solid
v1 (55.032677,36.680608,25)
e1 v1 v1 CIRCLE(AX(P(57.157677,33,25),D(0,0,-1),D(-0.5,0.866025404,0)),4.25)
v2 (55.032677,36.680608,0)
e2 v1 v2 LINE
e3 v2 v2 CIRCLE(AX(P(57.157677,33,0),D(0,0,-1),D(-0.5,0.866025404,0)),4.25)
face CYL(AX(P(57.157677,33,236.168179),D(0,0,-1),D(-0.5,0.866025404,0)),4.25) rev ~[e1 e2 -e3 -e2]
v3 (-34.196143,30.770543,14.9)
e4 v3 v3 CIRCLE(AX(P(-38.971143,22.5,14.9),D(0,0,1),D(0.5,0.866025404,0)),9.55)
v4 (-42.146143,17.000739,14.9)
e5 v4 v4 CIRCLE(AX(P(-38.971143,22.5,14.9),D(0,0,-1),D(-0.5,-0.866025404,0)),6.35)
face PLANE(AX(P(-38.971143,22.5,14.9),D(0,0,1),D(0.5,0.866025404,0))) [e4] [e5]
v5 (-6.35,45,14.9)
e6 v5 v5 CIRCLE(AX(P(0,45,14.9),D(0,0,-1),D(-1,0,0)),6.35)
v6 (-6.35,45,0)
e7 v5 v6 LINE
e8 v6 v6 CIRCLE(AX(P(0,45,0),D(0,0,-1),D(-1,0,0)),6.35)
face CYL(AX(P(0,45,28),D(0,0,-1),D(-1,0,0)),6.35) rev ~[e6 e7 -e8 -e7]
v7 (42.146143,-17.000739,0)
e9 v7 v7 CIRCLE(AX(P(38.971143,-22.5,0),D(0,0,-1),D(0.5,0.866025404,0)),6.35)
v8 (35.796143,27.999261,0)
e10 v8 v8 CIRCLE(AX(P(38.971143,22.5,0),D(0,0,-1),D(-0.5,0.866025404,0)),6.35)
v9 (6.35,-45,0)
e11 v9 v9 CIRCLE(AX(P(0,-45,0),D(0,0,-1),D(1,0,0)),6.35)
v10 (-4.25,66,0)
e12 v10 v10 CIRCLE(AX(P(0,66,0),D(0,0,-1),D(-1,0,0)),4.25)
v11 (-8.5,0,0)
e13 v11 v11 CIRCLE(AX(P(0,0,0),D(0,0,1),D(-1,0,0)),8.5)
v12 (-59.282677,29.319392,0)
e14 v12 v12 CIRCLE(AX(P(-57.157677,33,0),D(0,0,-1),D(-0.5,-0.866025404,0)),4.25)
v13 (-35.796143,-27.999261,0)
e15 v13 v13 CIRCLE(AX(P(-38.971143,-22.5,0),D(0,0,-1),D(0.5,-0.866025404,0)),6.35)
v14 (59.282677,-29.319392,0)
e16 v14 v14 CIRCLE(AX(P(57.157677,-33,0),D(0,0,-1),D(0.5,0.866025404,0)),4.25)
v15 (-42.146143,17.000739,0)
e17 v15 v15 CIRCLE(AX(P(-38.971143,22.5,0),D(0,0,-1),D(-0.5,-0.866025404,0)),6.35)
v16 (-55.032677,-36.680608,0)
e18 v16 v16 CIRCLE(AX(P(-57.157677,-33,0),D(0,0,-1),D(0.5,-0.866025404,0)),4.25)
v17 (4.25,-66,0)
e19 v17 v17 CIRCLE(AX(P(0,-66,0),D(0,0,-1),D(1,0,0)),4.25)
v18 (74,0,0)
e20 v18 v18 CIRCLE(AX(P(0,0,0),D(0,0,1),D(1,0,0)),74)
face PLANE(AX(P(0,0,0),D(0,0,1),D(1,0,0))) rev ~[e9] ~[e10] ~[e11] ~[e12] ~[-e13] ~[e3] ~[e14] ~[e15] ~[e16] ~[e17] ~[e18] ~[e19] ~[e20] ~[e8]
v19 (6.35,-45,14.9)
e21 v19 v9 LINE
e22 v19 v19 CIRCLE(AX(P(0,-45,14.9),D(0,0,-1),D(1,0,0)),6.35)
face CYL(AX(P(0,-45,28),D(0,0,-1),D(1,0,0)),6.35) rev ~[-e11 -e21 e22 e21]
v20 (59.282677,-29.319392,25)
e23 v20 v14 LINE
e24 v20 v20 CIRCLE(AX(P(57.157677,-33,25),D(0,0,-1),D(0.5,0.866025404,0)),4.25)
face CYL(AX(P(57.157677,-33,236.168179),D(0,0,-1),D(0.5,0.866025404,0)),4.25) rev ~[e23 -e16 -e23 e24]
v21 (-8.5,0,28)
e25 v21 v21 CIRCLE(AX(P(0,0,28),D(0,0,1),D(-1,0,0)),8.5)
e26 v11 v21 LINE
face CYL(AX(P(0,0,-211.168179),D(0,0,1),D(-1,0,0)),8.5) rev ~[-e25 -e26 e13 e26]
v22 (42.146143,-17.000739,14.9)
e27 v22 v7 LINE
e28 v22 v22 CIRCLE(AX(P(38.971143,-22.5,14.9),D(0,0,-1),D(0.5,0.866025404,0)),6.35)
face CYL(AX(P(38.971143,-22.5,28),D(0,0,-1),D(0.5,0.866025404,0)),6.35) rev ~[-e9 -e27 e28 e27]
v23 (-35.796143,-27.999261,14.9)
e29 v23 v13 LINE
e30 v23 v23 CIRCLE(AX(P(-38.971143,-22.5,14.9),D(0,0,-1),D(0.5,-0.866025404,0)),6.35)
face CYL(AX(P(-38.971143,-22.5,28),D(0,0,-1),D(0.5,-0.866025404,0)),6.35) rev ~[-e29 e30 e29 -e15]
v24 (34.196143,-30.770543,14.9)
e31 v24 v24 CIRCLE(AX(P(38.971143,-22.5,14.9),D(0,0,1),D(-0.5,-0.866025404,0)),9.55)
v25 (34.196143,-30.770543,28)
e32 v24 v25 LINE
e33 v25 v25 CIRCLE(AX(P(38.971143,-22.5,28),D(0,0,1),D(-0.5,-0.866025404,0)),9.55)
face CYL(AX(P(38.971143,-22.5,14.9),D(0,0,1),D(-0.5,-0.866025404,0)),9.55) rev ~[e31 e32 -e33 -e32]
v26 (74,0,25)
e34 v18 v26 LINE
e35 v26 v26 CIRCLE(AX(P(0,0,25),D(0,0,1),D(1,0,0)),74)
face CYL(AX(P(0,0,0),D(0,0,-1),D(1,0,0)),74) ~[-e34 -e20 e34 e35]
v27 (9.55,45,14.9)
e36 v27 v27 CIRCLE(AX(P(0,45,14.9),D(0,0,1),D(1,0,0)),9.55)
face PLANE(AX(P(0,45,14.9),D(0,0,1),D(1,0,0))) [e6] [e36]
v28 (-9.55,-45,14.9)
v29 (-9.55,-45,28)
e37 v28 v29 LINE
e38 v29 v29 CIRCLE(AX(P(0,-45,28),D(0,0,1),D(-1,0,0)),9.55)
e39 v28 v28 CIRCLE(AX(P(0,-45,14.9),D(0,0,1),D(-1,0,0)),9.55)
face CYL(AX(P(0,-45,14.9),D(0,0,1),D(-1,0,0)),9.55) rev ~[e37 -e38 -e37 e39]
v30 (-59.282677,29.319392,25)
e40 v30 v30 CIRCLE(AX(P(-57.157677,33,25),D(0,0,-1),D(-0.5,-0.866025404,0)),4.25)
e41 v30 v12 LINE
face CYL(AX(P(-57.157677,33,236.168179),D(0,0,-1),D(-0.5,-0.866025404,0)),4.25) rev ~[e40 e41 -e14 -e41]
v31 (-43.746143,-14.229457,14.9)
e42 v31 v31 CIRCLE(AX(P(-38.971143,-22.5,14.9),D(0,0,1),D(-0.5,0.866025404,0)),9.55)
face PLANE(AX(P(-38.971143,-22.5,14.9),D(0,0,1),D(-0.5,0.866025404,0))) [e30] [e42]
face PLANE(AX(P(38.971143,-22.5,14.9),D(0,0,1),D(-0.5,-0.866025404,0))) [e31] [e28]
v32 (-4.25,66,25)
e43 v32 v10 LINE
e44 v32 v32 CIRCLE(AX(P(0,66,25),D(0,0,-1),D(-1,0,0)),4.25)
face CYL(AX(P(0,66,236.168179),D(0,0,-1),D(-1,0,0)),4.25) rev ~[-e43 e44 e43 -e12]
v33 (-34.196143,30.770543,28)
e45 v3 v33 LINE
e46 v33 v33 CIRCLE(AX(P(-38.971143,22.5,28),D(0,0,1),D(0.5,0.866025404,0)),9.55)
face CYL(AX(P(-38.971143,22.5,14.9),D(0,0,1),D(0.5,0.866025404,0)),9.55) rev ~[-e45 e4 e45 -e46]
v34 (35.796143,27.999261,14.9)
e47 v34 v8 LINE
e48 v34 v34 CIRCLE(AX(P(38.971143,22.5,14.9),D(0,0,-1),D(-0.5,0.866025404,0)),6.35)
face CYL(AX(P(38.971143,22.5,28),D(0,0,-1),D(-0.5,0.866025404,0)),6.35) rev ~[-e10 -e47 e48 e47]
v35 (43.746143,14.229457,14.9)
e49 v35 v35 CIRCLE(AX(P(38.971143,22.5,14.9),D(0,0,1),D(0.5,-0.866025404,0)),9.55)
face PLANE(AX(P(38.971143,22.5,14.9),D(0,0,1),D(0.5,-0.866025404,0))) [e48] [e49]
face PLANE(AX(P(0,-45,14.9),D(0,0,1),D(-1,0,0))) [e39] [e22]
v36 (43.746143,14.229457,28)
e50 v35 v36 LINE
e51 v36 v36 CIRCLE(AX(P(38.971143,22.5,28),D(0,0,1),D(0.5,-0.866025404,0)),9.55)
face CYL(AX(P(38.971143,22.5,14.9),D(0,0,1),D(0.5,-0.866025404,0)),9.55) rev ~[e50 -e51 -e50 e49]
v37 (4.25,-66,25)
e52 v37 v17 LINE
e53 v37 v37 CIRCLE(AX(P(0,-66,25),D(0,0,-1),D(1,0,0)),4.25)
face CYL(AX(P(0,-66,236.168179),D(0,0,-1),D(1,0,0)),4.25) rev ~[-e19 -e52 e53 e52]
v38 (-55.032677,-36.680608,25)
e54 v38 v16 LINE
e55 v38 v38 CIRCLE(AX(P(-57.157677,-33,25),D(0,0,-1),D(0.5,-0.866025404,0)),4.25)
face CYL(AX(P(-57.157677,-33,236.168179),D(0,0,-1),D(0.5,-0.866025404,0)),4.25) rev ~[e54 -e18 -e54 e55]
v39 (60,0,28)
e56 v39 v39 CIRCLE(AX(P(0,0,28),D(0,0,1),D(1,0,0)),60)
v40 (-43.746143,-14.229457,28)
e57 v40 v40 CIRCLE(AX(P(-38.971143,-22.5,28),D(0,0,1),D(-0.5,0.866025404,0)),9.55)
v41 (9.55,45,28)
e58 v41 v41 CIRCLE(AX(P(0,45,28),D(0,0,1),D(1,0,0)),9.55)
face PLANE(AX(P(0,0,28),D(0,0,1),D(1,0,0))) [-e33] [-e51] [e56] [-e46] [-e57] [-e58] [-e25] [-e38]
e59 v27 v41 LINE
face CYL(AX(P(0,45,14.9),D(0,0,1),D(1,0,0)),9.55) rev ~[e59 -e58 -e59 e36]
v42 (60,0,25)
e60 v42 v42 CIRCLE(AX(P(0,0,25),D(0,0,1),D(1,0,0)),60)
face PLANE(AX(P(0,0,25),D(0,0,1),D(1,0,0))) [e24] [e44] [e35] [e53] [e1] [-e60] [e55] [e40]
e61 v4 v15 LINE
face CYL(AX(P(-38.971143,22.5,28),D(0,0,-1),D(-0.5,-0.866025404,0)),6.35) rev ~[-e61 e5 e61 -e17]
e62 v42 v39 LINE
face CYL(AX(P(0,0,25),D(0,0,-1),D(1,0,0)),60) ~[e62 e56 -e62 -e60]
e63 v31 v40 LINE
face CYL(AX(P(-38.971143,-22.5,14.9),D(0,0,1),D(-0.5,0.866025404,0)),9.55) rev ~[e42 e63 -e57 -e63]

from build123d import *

# Parameters (mm, degrees)
F0_R            = 74
F1_DEPTH        = 25
F2_R            = 60
F3_DEPTH        = 3
F4_D            = 17
F6_D            = 8.5
F6_COPIES_COUNT = 6
F8_D            = 12.7
F8_CBORE_D      = 19.1
F8_CBORE_DEPTH  = 13.1
F8_COPIES_COUNT = 6


# Not quite as in the source:
# - a pattern or mirror of a feature is missing from the dataset's text; its kind, count and spacing are read off the source's solid


with BuildPart() as f1:
    # F0 (on Top) → F1 (new body)
    with BuildSketch(Plane.XY):
        Circle(F0_R)
    extrude(amount=F1_DEPTH)

    # F2 (on face) → F3 (join)
    with BuildSketch(Plane.XY.offset(25)):
        Circle(F2_R)
    extrude(amount=F3_DEPTH)

    # F4 (through all)
    with Locations(Plane(origin=(0, 0, 0), x_dir=(1, 0, 0), z_dir=(0, 0, -1))):
        with Locations((0, 0)):
            Hole(F4_D / 2)

    # F6 (through all)
    with Locations(Plane.XY.offset(25)):
        with Locations((0, 66)):
            f6 = Hole(F6_D / 2)

    # F6_copies: F6 ×6 about axis
    f6_copies_axis = Axis((0, 0, 0), (0, 0, 1))
    for i in range(1, F6_COPIES_COUNT):
        add(f6.rotate(f6_copies_axis, i * 360 / F6_COPIES_COUNT), mode=Mode.SUBTRACT)

    # F8 (through all)
    with Locations(Plane.XY.offset(28)):
        with Locations((0, 45)):
            f8 = CounterBoreHole(F8_D / 2, F8_CBORE_D / 2, F8_CBORE_DEPTH)

    # F8_copies: F8 ×6 about axis
    f8_copies_axis = Axis((0, 0, 0), (0, 0, 1))
    for i in range(1, F8_COPIES_COUNT):
        add(f8.rotate(f8_copies_axis, i * 360 / F8_COPIES_COUNT), mode=Mode.SUBTRACT)


solid = f1.part
